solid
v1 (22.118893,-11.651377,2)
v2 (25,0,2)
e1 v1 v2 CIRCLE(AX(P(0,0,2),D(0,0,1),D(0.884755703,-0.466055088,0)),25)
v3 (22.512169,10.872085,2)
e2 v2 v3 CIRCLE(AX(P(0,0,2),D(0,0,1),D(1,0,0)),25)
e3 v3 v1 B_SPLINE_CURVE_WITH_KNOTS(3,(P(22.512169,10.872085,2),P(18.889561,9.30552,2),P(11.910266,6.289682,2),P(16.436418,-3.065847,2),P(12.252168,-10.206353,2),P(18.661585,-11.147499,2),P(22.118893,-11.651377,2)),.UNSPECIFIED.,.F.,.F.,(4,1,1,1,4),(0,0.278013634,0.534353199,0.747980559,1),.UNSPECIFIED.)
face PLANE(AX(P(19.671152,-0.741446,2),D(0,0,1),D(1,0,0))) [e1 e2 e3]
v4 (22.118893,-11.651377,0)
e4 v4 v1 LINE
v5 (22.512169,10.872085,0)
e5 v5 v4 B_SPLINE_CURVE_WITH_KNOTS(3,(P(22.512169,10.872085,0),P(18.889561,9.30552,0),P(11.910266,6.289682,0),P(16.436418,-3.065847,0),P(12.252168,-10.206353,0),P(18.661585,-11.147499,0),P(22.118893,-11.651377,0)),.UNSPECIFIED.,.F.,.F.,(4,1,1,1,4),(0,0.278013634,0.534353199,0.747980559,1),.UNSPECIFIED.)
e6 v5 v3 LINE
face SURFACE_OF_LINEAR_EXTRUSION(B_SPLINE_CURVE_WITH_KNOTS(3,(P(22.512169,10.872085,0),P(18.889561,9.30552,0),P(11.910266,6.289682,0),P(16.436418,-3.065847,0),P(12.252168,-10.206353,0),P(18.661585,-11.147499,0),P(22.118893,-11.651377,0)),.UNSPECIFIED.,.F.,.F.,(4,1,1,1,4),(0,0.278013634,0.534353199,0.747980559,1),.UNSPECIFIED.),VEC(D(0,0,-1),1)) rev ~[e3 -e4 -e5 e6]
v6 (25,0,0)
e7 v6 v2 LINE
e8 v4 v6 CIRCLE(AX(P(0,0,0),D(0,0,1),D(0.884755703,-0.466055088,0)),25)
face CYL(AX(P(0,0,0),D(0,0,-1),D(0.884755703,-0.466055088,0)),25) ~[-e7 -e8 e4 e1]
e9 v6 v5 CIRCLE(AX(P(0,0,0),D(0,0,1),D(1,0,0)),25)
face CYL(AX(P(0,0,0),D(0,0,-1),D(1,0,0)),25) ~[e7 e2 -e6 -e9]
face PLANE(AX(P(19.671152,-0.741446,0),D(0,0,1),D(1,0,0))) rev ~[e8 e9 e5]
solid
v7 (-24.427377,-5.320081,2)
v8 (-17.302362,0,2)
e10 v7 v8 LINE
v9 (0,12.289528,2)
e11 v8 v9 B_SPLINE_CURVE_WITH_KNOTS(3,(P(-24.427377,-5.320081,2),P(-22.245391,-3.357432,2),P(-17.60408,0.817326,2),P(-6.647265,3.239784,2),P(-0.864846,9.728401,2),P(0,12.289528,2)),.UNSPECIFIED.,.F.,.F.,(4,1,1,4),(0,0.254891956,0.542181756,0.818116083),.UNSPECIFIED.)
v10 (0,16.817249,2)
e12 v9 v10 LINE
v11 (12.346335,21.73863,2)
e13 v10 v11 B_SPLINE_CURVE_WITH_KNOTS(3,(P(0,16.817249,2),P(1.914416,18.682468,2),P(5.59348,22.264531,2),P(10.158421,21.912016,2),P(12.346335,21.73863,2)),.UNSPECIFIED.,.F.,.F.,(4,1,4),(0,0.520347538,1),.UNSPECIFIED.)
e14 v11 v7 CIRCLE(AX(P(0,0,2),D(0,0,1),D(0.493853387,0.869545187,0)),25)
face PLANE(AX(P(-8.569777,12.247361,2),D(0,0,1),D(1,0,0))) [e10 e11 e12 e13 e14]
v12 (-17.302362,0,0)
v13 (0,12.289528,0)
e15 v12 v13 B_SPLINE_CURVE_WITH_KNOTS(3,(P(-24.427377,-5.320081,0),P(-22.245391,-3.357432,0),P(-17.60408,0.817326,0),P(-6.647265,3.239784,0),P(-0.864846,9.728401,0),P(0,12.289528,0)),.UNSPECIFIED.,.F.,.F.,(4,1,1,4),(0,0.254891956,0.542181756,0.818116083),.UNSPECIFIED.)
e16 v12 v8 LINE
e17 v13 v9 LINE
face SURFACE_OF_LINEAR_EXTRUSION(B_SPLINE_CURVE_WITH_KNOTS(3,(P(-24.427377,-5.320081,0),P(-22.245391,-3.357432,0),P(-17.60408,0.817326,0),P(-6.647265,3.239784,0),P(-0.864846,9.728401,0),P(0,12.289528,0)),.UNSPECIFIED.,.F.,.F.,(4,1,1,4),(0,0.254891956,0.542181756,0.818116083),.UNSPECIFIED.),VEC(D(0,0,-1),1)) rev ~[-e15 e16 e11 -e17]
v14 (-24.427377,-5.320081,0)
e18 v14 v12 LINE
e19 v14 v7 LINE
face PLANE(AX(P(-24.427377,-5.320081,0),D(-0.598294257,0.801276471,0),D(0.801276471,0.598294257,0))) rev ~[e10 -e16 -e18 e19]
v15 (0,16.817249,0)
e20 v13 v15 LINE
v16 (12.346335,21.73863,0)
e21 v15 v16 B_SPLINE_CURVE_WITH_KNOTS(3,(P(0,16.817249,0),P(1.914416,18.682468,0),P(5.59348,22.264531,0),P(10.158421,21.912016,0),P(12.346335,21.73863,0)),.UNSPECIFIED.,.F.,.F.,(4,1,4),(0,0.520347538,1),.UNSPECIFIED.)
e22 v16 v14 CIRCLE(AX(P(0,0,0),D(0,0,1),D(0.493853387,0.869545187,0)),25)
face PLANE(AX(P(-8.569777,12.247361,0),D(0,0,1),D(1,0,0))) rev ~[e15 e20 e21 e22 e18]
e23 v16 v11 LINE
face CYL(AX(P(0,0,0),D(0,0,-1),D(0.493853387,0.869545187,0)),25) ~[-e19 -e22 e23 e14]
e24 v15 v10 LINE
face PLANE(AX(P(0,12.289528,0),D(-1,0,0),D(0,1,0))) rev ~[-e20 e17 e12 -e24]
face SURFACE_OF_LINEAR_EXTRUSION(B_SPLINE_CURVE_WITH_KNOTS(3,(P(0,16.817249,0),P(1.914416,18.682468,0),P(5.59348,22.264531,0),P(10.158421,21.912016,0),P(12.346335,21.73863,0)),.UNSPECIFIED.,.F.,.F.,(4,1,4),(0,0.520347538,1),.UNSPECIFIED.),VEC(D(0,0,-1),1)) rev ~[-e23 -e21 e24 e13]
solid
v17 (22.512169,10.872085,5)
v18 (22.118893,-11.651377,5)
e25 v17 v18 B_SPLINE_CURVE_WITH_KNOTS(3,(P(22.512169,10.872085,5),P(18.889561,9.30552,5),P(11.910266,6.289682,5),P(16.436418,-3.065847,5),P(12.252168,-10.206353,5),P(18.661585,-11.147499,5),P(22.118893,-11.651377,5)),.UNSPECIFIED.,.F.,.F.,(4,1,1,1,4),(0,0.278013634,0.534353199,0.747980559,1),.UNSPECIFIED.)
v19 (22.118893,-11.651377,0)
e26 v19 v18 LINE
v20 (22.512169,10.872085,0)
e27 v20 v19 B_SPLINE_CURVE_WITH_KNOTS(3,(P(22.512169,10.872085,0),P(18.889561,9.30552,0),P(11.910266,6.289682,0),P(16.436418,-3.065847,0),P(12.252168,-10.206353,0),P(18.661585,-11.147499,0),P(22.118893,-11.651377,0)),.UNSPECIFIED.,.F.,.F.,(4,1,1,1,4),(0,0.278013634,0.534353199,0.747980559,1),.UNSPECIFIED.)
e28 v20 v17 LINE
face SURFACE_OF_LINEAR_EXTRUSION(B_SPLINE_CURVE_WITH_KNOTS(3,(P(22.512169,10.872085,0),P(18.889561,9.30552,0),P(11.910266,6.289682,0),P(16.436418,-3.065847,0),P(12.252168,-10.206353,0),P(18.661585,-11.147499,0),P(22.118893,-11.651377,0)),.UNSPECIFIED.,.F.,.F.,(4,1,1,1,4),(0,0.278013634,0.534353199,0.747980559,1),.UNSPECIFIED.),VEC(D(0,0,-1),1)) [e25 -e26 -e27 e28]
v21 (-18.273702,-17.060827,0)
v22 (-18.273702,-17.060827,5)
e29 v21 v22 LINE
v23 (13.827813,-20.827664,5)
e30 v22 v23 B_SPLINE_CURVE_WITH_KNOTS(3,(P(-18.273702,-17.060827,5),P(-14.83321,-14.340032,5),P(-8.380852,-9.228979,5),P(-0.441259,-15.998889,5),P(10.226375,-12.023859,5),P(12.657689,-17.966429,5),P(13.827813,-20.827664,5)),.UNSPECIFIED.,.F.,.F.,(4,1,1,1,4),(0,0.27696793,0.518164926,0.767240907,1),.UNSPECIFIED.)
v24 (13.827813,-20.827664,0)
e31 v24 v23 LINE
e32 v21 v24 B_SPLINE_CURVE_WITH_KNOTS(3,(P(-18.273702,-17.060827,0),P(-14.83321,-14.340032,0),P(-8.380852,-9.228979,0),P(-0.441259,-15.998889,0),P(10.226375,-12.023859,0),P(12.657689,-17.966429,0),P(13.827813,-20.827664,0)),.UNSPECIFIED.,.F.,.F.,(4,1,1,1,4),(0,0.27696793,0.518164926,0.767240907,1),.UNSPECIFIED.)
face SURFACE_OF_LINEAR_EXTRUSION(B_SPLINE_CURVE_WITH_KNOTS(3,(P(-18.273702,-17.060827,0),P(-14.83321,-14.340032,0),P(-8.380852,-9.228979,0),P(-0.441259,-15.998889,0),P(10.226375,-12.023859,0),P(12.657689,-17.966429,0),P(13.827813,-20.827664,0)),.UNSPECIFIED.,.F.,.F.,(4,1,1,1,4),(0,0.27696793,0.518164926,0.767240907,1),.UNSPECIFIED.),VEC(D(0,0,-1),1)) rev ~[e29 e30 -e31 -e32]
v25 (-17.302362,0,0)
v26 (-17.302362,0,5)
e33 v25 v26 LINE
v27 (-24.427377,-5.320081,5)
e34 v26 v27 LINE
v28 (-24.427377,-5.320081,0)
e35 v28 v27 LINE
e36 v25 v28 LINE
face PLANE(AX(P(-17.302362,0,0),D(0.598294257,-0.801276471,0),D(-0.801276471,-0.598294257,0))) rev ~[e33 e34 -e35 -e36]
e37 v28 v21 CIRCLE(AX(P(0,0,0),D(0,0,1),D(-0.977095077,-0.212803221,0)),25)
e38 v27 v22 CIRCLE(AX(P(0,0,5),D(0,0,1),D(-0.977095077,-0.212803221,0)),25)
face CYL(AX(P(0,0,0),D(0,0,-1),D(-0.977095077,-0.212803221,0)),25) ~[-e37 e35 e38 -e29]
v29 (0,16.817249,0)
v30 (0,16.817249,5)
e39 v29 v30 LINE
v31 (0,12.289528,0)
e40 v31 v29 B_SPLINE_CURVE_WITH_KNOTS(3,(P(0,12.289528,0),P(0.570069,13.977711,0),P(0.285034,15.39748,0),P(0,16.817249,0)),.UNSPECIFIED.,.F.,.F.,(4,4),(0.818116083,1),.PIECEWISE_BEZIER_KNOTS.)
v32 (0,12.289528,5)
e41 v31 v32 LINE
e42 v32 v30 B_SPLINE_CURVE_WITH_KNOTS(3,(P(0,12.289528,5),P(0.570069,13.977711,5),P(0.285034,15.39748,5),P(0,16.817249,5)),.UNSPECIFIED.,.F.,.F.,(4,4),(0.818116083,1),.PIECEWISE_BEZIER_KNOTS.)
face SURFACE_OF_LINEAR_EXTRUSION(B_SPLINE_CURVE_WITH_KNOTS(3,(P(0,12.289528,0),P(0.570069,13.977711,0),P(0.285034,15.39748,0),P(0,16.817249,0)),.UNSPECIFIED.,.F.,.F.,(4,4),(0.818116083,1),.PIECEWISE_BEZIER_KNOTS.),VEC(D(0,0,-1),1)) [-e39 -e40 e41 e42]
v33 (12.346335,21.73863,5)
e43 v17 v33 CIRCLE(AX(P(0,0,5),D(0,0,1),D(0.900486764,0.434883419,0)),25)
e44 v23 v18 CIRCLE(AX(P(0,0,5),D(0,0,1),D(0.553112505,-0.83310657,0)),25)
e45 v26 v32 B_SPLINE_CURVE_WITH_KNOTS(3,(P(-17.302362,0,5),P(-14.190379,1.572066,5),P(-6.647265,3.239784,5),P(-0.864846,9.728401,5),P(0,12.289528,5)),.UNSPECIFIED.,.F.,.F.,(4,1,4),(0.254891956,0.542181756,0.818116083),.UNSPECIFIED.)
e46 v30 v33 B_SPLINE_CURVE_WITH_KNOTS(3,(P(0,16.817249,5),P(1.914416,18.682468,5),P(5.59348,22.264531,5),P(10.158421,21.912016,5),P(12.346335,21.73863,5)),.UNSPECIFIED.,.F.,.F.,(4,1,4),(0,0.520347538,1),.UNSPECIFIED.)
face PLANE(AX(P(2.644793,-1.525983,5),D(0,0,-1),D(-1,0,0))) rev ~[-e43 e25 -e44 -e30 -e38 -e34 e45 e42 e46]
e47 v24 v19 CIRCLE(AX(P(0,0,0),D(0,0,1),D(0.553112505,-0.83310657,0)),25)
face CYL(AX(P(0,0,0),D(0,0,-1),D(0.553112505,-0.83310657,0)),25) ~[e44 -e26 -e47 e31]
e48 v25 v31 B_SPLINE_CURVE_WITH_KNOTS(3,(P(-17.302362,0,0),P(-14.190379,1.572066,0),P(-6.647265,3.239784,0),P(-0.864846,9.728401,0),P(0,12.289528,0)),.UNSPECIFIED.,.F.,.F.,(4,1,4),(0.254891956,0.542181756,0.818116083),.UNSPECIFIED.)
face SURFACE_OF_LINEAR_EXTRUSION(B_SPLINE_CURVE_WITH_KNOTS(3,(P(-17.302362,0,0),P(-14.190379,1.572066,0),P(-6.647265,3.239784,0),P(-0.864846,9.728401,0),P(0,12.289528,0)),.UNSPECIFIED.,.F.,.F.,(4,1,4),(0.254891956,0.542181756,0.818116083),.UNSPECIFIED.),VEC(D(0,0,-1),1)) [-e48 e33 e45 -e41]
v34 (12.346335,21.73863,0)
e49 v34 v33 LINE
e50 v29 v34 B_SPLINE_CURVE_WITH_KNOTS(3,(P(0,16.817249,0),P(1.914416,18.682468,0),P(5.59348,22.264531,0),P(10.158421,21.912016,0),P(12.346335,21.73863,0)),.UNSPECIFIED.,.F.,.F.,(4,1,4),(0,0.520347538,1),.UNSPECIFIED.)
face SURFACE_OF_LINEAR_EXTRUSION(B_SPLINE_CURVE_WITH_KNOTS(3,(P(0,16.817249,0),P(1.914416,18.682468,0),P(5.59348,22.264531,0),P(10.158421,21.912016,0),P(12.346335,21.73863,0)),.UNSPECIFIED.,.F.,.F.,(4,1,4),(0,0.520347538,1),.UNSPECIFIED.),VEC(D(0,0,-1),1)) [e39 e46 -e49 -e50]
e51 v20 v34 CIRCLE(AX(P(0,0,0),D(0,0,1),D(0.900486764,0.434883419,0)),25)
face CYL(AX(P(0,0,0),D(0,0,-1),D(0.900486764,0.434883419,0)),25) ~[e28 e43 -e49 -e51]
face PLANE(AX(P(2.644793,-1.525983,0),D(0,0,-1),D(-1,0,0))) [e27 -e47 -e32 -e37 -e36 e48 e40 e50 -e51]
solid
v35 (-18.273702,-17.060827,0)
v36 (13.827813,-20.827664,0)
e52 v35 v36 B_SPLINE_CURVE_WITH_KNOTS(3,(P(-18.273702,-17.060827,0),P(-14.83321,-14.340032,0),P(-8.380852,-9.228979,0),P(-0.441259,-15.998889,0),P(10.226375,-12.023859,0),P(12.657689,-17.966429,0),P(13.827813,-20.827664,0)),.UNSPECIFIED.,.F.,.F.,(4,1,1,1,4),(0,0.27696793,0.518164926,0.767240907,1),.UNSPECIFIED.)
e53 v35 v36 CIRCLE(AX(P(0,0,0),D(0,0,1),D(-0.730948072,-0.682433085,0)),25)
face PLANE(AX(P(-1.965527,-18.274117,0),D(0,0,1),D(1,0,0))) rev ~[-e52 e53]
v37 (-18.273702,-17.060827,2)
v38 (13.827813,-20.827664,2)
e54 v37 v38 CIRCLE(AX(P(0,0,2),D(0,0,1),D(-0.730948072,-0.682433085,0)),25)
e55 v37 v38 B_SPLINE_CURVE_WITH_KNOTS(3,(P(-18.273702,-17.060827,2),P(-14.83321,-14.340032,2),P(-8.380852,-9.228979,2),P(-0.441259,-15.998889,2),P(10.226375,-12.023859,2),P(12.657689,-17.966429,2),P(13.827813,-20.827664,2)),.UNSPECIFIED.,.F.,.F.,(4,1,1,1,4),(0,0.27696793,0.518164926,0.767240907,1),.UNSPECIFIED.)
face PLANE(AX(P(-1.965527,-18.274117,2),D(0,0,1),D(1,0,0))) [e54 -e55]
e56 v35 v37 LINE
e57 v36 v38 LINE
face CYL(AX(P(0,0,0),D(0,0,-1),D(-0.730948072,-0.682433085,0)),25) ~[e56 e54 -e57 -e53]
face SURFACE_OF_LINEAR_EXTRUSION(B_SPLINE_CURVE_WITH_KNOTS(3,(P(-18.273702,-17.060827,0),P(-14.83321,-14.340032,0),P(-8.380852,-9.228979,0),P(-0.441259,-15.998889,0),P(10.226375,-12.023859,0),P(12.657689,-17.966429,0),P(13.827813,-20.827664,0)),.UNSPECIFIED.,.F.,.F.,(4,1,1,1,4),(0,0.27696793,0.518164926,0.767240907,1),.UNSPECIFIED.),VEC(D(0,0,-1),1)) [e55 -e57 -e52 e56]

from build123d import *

# Parameters (mm, degrees)
F1_DEPTH = 2
F2_DEPTH = 5


with BuildPart() as f1:
    # F0 (on Top) → F1 (new body)
    with BuildSketch(Plane.XY):
        with BuildLine():
            ThreePointArc((22.1188925873, -11.6513772023), (24.2690370089, -6.001153444), (25, 0))
            ThreePointArc((25, 0), (24.3701069704, 5.5765478793), (22.5121691, 10.8720854676))
            add(Edge.make_bspline(
                [(22.5121691, 10.8720854676), (18.8895611428, 9.3055197167), (11.9102659407, 6.2896821538), (16.4364178682, -3.0658471403), (12.2521680449, -10.2063529762), (18.6615851191, -11.1474987265), (22.1188925873, -11.6513772023)],
                knots=[0, 0, 0, 0, 0.2780136343, 0.5343531988, 0.7479805585, 1, 1, 1, 1], degree=3))
        make_face()
    extrude(amount=F1_DEPTH)


with BuildPart() as f1b:
    # F0 (on Top) → F1, piece 2 (new body)
    with BuildSketch(Plane.XY):
        with BuildLine():
            add(Edge.make_bspline(
                [(0, 16.8172493577), (1.9144161531, 18.6824676113), (5.5934798745, 22.2645311542), (10.1584208321, 21.9120162799), (12.34633467, 21.7386296766)],
                knots=[0, 0, 0, 0, 0.5203475383, 1, 1, 1, 1], degree=3))
            ThreePointArc((12.34633467, 21.7386296766), (-14.8165901958, 20.1362522573), (-24.4273769181, -5.3200805351))
            add(Edge.make_bspline(
                [(-24.4273769181, -5.3200805351), (-22.2453911763, -3.3574319676), (-20.0634054345, -1.3947834001), (-17.3023622483, 0)],
                knots=[0, 0, 0, 0, 0.254891956, 0.254891956, 0.254891956, 0.254891956], degree=3))
            add(Edge.make_bspline(
                [(-17.3023622483, 0), (-14.1903788127, 1.5720662607), (-6.6472654424, 3.2397841474), (-0.8648455283, 9.7284013886), (0, 12.2895278037)],
                knots=[0.254891956, 0.254891956, 0.254891956, 0.254891956, 0.542181756, 0.8181160828, 0.8181160828, 0.8181160828, 0.8181160828], degree=3))
            Line((0, 12.2895278037), (0, 16.8172493577))
        make_face()
        with BuildLine():
            add(Edge.make_bspline(
                [(-24.4273769181, -5.3200805351), (-22.2453911763, -3.3574319676), (-20.0634054345, -1.3947834001), (-17.3023622483, 0)],
                knots=[0, 0, 0, 0, 0.254891956, 0.254891956, 0.254891956, 0.254891956], degree=3))
            Line((-24.4273769181, -5.3200805351), (-17.3023622483, 0))
        make_face()
    extrude(amount=F1_DEPTH)


with BuildPart() as f1c:
    # F0 (on Top) → F1, piece 3 (new body)
    with BuildSketch(Plane.XY):
        with BuildLine():
            ThreePointArc((-18.2737018092, -17.0608271249), (-2.9135456355, -24.8296446175), (13.8278126154, -20.8276642539))
            add(Edge.make_bspline(
                [(-18.2737018092, -17.0608271249), (-14.8332101277, -14.3400323801), (-8.3808524987, -9.228978734), (-0.4412585546, -15.998889193), (10.2263751779, -12.0238586347), (12.6576888155, -17.9664290501), (13.8278126154, -20.8276642539)],
                knots=[0, 0, 0, 0, 0.2769679297, 0.5181649262, 0.767240907, 1, 1, 1, 1], degree=3))
        make_face()
    extrude(amount=F1_DEPTH)


with BuildPart() as f2:
    # F0 (on Top) → F2 (new body)
    with BuildSketch(Plane.XY):
        with BuildLine():
            add(Edge.make_bspline(
                [(22.5121691, 10.8720854676), (18.8895611428, 9.3055197167), (11.9102659407, 6.2896821538), (16.4364178682, -3.0658471403), (12.2521680449, -10.2063529762), (18.6615851191, -11.1474987265), (22.1188925873, -11.6513772023)],
                knots=[0, 0, 0, 0, 0.2780136343, 0.5343531988, 0.7479805585, 1, 1, 1, 1], degree=3))
            ThreePointArc((22.5121691, 10.8720854676), (18.2564856156, 17.0792486067), (12.34633467, 21.7386296766))
            add(Edge.make_bspline(
                [(0, 16.8172493577), (1.9144161531, 18.6824676113), (5.5934798745, 22.2645311542), (10.1584208321, 21.9120162799), (12.34633467, 21.7386296766)],
                knots=[0, 0, 0, 0, 0.5203475383, 1, 1, 1, 1], degree=3))
            add(Edge.make_bspline(
                [(0, 12.2895278037), (0.5700685894, 13.9777110398), (0.2850342947, 15.3974801988), (0, 16.8172493577)],
                knots=[0.8181160828, 0.8181160828, 0.8181160828, 0.8181160828, 1, 1, 1, 1], degree=3))
            add(Edge.make_bspline(
                [(-17.3023622483, 0), (-14.1903788127, 1.5720662607), (-6.6472654424, 3.2397841474), (-0.8648455283, 9.7284013886), (0, 12.2895278037)],
                knots=[0.254891956, 0.254891956, 0.254891956, 0.254891956, 0.542181756, 0.8181160828, 0.8181160828, 0.8181160828, 0.8181160828], degree=3))
            Line((-17.3023622483, 0), (-24.4273769181, -5.3200805351))
            ThreePointArc((-24.4273769181, -5.3200805351), (-22.1428727527, -11.6057393672), (-18.2737018092, -17.0608271249))
            add(Edge.make_bspline(
                [(-18.2737018092, -17.0608271249), (-14.8332101277, -14.3400323801), (-8.3808524987, -9.228978734), (-0.4412585546, -15.998889193), (10.2263751779, -12.0238586347), (12.6576888155, -17.9664290501), (13.8278126154, -20.8276642539)],
                knots=[0, 0, 0, 0, 0.2769679297, 0.5181649262, 0.767240907, 1, 1, 1, 1], degree=3))
            ThreePointArc((13.8278126154, -20.8276642539), (18.549729506, -16.7602963951), (22.1188925873, -11.6513772023))
        make_face()
    extrude(amount=F2_DEPTH)


solid = Compound([f1.part, f1b.part, f1c.part, f2.part])
